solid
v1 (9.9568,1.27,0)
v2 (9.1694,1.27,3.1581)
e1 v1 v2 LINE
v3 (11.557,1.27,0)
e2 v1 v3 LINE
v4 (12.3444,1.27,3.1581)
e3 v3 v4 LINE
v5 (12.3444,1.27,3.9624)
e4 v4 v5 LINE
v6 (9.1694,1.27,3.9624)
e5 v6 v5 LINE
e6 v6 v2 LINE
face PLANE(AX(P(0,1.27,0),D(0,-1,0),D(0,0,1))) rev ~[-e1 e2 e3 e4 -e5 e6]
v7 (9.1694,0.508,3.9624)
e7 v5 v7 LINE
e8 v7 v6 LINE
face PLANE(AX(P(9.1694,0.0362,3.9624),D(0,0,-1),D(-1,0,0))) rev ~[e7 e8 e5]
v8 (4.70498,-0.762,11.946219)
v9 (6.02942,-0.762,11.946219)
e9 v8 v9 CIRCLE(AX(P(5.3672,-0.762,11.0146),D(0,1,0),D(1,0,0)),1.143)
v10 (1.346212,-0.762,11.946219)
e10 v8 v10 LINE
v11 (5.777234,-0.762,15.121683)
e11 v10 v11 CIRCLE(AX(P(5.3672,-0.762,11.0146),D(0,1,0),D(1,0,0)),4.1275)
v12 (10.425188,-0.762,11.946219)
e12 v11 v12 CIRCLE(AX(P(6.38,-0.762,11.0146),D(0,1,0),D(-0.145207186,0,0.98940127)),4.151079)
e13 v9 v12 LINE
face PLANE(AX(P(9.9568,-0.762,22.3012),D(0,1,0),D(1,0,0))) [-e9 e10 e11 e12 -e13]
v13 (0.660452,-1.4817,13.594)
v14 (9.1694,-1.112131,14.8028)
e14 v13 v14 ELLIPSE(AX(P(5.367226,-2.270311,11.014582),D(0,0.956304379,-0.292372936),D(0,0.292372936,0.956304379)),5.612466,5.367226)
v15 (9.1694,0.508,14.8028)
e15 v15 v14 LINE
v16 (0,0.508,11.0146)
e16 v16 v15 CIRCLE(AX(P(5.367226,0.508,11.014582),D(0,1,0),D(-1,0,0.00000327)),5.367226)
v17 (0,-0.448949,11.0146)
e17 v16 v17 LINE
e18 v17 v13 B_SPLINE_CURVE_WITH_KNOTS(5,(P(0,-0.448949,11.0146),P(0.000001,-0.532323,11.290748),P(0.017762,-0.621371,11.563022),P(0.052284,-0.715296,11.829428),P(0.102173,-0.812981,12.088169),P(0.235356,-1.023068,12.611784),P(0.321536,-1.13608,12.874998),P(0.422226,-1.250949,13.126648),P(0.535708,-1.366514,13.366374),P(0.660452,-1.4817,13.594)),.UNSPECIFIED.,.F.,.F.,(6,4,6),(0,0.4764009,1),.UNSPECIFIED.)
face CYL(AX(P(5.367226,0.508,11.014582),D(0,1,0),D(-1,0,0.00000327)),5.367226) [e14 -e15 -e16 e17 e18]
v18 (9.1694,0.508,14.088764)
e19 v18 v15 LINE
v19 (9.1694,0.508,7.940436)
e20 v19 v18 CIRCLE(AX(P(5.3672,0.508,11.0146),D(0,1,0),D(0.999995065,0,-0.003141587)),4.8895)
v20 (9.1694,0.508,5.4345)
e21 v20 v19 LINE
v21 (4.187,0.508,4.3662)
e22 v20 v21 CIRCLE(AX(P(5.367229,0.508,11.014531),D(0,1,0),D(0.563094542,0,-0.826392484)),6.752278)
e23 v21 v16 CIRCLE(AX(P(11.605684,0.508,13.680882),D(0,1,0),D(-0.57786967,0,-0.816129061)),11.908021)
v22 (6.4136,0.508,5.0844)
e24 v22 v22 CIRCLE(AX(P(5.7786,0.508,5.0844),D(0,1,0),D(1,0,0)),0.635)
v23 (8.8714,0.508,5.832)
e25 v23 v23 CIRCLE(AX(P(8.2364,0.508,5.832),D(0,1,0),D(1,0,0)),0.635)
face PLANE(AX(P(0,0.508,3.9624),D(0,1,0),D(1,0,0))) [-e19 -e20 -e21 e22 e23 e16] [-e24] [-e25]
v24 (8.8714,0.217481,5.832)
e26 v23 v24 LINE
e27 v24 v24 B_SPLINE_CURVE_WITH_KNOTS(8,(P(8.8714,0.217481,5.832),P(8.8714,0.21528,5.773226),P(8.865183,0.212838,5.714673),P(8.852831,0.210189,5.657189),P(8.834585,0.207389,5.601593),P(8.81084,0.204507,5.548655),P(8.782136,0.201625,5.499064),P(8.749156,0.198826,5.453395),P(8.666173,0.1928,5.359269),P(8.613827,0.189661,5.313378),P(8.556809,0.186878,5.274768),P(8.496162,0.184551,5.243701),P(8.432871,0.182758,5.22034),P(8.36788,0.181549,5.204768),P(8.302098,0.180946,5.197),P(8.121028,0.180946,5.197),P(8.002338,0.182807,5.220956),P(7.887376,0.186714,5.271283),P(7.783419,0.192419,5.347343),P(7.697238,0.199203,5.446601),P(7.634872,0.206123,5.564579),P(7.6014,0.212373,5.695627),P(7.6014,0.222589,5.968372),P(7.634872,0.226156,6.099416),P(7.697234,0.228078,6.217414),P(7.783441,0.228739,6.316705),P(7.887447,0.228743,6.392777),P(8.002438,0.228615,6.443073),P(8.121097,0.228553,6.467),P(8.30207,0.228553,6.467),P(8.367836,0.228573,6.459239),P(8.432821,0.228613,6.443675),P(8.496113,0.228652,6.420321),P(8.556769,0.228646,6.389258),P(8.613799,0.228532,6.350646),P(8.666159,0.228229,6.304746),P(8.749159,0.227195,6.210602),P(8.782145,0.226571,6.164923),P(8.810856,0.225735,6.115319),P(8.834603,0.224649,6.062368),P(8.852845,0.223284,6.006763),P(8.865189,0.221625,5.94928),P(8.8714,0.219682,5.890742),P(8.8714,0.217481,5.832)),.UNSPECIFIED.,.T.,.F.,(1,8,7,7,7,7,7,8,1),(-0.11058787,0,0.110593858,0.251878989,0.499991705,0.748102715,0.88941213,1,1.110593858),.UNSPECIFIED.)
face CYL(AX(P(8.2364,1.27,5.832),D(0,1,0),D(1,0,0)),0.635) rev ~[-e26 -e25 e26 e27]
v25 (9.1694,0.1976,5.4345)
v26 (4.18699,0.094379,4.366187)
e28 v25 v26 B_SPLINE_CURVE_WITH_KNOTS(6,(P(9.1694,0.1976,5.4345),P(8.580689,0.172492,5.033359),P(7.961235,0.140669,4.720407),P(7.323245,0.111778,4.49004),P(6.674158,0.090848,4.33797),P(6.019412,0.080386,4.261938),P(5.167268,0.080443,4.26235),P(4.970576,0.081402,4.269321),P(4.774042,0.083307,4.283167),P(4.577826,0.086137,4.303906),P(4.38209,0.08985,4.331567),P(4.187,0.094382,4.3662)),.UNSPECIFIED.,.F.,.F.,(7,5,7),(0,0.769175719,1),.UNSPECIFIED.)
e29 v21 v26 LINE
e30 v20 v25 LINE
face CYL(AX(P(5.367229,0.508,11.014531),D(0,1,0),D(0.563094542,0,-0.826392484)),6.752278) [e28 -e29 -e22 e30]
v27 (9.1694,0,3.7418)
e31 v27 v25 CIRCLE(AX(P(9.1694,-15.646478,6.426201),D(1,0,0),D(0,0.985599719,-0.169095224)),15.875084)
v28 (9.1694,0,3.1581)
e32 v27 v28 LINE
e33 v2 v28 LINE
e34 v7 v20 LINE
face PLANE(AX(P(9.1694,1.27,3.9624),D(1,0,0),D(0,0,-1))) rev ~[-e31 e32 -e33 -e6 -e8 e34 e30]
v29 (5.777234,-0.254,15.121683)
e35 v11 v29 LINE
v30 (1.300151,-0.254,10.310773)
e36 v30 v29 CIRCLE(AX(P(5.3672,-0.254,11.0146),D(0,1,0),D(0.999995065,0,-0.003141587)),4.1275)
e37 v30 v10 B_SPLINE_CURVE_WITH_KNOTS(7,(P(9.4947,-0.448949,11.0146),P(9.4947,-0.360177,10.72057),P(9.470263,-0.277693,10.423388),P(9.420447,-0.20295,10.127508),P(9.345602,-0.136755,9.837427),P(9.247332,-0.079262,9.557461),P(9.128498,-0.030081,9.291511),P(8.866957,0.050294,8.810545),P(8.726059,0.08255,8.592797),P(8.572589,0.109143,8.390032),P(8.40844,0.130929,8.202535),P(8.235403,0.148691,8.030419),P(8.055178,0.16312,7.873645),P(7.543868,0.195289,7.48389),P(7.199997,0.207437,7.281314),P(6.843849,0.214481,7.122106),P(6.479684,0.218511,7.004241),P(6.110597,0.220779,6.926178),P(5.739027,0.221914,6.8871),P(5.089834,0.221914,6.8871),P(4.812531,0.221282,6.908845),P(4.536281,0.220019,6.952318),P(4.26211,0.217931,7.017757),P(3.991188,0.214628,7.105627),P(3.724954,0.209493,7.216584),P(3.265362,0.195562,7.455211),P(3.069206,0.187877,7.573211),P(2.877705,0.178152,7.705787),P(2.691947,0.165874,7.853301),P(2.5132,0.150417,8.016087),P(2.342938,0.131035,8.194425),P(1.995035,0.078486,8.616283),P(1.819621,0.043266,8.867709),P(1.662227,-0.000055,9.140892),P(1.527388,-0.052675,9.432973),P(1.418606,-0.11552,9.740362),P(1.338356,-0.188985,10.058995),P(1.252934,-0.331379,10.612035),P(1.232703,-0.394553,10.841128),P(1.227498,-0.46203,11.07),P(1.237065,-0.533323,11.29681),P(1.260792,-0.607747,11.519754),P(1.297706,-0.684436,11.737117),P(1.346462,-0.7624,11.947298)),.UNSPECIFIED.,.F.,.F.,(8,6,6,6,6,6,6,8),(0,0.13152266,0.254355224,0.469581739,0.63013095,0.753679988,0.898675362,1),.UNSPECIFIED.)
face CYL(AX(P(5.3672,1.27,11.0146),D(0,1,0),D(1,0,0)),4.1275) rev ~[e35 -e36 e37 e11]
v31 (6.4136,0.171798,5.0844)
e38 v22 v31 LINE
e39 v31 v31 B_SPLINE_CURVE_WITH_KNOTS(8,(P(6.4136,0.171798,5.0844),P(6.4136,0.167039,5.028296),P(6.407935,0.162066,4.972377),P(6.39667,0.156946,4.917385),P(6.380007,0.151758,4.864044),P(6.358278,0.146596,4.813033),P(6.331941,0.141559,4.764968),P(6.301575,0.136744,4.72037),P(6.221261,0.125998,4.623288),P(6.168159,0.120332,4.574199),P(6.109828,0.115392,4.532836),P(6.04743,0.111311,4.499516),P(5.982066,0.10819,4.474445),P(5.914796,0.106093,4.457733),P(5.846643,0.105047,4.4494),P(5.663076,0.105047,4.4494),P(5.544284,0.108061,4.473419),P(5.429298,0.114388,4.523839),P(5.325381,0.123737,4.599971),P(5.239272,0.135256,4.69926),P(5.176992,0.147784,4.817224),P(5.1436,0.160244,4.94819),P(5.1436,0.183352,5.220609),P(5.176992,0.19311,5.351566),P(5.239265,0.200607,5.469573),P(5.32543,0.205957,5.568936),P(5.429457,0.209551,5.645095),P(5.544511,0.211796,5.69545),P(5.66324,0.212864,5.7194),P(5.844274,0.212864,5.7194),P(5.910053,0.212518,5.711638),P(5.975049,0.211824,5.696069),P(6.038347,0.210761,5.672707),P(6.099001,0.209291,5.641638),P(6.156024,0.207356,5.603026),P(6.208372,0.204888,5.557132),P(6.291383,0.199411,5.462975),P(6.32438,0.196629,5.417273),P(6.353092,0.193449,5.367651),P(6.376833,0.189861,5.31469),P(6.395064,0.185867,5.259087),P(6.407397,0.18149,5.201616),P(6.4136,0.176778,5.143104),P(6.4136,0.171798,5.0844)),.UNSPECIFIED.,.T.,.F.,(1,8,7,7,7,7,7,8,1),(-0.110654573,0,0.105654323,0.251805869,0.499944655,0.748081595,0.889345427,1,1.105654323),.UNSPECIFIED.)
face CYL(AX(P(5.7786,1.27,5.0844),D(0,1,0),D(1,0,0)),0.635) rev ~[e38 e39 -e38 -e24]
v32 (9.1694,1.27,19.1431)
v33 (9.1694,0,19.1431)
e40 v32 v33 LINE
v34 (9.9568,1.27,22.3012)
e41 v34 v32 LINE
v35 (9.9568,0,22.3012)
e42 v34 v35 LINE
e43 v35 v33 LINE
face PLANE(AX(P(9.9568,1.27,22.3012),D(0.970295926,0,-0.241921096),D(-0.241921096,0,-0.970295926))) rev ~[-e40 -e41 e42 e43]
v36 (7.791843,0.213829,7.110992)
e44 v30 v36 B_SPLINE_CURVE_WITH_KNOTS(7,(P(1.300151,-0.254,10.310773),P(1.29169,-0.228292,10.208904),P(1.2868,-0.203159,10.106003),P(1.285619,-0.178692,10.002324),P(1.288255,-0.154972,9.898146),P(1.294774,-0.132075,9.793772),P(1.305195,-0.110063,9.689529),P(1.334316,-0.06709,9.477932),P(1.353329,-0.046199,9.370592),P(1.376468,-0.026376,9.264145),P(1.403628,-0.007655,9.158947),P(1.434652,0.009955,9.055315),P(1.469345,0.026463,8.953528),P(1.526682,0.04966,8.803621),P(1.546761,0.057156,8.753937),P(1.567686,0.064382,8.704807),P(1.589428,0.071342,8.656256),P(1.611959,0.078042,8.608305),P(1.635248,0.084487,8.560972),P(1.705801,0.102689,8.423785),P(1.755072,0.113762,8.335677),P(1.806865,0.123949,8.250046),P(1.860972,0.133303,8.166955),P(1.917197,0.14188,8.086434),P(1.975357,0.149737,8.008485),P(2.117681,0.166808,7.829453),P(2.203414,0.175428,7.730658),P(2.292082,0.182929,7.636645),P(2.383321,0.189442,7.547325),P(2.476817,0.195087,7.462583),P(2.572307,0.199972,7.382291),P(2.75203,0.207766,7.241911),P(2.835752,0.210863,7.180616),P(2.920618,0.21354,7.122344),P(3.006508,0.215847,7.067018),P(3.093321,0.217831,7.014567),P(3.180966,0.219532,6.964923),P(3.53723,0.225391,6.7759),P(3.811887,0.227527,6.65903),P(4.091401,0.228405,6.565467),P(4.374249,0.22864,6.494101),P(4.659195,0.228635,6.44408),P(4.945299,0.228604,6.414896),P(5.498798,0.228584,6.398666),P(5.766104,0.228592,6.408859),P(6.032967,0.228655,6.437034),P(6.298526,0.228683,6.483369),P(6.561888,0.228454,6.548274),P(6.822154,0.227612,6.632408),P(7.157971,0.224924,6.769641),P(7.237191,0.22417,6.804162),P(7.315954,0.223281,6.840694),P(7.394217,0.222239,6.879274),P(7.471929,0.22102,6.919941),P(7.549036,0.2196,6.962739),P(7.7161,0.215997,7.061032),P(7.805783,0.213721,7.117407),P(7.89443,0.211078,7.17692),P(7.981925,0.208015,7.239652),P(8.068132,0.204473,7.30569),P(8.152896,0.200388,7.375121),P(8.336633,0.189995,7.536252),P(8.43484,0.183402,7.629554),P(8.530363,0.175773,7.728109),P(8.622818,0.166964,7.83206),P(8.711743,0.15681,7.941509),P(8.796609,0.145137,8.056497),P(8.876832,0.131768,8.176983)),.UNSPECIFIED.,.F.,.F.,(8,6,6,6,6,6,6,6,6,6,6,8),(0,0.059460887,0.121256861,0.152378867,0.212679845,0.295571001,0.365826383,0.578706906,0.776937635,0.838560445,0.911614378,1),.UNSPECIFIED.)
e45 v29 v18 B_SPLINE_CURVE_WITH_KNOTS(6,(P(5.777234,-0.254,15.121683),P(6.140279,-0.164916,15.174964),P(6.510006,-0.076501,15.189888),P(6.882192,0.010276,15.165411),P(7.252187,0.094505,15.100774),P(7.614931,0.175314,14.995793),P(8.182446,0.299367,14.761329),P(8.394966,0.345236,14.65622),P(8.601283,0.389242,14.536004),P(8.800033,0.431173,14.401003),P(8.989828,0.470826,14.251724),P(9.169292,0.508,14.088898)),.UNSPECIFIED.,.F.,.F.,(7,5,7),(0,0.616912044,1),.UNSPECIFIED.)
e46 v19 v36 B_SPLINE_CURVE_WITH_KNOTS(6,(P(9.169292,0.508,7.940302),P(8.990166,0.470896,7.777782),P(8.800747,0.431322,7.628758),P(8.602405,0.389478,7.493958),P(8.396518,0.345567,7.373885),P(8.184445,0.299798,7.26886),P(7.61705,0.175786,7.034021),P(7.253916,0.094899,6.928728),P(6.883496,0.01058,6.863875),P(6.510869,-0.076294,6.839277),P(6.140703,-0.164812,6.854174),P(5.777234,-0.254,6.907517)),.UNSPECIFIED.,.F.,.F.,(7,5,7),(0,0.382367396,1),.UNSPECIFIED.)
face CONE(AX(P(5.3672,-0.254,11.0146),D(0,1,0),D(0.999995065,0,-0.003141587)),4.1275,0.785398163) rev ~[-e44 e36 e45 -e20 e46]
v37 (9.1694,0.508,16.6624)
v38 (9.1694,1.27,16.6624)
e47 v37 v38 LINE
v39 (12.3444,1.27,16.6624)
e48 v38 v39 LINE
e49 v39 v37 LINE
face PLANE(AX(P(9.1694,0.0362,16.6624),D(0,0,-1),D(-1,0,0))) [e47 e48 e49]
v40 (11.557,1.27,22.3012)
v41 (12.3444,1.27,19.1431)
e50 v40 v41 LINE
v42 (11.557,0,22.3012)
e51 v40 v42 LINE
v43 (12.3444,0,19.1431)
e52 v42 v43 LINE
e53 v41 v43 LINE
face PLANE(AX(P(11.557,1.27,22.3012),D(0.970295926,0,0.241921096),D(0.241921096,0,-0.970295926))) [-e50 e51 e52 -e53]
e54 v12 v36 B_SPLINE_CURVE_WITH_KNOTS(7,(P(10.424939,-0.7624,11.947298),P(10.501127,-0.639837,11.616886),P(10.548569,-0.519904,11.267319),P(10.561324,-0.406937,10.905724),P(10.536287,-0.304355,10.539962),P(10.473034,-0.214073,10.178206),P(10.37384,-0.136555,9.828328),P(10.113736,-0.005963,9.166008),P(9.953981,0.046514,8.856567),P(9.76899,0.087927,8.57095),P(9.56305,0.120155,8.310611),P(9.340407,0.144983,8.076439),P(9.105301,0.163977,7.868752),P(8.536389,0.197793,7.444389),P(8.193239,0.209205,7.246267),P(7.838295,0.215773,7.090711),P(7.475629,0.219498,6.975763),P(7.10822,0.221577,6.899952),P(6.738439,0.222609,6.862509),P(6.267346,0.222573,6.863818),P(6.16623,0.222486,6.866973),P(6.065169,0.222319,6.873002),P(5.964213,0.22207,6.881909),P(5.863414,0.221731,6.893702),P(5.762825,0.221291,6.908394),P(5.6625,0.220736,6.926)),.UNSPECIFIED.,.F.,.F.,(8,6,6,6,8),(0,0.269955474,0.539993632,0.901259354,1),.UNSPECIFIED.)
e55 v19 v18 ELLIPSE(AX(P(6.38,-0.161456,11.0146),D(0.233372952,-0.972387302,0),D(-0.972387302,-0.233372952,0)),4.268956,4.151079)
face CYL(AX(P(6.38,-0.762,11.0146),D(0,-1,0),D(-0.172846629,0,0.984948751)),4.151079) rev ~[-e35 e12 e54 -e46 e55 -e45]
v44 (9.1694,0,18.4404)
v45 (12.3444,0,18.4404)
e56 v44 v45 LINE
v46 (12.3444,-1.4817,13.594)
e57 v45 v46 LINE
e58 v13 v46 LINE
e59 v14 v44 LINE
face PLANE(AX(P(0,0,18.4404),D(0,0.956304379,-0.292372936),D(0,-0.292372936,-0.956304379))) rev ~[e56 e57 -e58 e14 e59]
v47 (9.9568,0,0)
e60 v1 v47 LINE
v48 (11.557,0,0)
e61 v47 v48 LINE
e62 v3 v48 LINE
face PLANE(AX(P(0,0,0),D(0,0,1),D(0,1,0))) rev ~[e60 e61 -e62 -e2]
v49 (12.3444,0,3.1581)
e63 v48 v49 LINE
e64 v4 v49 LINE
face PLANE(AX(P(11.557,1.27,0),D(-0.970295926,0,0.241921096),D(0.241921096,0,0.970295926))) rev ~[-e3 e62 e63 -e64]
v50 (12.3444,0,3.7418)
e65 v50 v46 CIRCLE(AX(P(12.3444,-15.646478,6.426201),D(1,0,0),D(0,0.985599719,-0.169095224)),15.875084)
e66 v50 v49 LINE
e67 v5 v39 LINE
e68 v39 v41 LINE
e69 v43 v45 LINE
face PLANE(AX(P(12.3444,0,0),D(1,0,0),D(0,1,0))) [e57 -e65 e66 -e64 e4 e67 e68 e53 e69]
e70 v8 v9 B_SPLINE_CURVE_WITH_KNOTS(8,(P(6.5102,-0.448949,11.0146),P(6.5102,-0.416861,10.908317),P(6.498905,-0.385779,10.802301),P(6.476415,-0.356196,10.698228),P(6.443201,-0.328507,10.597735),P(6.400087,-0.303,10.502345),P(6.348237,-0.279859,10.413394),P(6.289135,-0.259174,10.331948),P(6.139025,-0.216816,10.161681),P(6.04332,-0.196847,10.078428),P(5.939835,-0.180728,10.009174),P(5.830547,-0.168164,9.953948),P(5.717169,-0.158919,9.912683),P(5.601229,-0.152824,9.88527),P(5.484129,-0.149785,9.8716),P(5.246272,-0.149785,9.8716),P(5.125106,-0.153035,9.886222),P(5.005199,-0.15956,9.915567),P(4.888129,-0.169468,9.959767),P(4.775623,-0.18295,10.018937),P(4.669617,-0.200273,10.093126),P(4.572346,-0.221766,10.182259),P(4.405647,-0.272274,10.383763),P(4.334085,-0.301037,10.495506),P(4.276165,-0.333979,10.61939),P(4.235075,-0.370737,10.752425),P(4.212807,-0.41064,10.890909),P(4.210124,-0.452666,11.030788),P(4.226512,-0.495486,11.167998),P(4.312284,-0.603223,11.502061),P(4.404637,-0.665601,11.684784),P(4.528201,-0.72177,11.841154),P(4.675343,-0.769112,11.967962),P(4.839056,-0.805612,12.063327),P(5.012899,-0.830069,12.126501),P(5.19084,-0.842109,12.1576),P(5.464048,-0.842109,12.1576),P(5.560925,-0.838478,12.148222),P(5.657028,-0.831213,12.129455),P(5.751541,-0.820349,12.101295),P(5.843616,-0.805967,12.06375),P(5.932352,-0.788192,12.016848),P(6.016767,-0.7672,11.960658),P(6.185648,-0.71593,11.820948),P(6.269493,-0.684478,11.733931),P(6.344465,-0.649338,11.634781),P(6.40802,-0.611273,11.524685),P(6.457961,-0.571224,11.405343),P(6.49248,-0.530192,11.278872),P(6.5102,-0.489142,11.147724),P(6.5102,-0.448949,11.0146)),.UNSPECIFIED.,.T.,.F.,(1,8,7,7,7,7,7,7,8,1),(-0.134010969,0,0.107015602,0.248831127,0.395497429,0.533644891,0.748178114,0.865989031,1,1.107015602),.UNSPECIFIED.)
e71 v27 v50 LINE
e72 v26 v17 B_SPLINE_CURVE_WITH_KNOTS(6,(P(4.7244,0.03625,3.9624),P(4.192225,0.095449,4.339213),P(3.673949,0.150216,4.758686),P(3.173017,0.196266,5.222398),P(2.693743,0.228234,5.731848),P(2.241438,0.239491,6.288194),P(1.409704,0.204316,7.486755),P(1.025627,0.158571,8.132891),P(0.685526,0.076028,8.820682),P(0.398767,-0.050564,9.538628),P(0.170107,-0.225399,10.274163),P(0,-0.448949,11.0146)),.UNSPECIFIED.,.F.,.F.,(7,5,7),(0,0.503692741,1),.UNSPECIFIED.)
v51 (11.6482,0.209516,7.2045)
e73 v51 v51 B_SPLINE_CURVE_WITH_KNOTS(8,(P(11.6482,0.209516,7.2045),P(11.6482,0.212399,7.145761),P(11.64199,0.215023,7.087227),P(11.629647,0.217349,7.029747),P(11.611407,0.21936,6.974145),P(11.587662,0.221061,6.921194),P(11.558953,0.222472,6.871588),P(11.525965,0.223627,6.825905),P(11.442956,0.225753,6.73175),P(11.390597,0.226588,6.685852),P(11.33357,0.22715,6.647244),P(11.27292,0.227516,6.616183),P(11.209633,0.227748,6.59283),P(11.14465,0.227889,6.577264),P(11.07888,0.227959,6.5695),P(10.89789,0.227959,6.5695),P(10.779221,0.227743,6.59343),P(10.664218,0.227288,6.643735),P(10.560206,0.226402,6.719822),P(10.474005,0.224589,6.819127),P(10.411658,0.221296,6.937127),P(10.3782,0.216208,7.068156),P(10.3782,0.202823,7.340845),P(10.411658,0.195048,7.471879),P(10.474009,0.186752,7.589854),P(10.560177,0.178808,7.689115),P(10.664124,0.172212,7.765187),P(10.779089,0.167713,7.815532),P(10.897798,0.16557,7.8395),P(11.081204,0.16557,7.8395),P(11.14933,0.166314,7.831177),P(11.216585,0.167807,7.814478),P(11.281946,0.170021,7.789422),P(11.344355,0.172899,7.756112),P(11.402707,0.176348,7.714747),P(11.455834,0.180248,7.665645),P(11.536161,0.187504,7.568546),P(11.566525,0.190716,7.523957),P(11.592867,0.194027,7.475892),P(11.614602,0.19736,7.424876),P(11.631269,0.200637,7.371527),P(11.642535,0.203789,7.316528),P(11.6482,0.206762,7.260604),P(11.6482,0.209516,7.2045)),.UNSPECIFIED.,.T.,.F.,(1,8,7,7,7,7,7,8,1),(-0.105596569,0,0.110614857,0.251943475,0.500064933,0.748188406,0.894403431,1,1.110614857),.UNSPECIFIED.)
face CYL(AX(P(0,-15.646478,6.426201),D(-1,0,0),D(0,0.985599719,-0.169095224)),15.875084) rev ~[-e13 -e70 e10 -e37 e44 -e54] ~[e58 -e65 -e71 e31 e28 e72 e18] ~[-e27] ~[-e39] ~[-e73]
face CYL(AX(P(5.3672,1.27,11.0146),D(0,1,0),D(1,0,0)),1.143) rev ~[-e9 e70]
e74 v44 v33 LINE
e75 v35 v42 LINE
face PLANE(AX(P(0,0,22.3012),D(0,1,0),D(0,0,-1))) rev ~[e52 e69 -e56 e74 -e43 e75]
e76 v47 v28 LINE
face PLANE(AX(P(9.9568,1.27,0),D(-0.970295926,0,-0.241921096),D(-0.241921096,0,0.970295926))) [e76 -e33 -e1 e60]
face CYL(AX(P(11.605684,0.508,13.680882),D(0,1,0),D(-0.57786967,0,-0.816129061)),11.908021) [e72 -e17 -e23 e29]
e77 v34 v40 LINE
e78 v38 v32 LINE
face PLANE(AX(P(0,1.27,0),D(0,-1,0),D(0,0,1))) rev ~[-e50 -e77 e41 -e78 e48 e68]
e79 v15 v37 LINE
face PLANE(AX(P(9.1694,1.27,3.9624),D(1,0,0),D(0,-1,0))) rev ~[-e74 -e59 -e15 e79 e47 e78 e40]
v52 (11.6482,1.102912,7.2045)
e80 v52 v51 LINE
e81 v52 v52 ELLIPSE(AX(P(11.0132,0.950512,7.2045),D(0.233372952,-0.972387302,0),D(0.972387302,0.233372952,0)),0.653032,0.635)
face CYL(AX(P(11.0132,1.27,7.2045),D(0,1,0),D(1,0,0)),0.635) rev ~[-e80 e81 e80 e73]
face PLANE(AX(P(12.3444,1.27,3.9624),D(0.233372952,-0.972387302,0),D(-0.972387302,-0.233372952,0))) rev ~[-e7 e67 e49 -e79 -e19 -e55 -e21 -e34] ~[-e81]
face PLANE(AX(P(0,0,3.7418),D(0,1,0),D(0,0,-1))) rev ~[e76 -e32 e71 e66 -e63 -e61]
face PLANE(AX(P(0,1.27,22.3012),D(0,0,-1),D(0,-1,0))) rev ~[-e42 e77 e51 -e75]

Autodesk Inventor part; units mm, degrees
ref_plane "YZ Plane" through (0, 0, 0) normal (1, 0, 0) x (0, 1, 0)
ref_plane "XZ Plane" through (0, 0, 0) normal (0, 1, 0) x (-1, 0, 0)
ref_plane "XY Plane" through (0, 0, 0) normal (0, 0, 1) x (1, 0, 0)
sketch "Sketch1" plane through (0, 0, 0) normal (1, 0, 0) x (0, 1, 0)
  line L0 (0, 0) -> (1.27, 0)
  line L1 (1.27, 0) -> (1.27, 22.3012)
  line L2 (1.27, 22.3012) -> (0, 22.3012)
  arc A0 (0, 3.7418) -> (-1.4817, 13.594) centre (-15.6464, 6.4262) ccw
  line L3 (0, 18.4404) -> (-1.4817, 13.594)
  line L4 (0, 22.3012) -> (0, 18.4404)
  line L5 (0, 3.7418) -> (0, 0)
  dimension "d0" = 1.27
  dimension "d1" = 22.3012
  dimension "d2" = 31.75
  dimension "d3" = 6.4262
  dimension "d4" = 16.9164
  dimension "d6" = 3.8608
extrude "Extrusion1" add sketch "Sketch1" along normal blind 12.3444
sketch "Sketch2" plane through (0, 1.27, 22.3012) normal (0, 1, 0) x (1, 0, 0)
  line L0 (0, 0) -> (12.3444, 0) projected
  line L1 (9.9568, 0) -> (9.1694, 3.1581)
  line L2 (11.557, 0) -> (12.3444, 3.1581)
  line L3 (9.1694, 3.1581) -> (9.1694, 19.1431)
  line L4 (12.3444, 22.3012) -> (12.3444, 0) projected
  line L5 (10.7569, 0) -> (10.7569, 22.3012)
  line L6 (0, 22.3012) -> (12.3444, 22.3012) projected
  line L7 (9.9568, 22.3012) -> (9.1694, 19.1431)
  line L8 (11.557, 22.3012) -> (12.3444, 19.1431)
  line L9 (9.1694, 19.1431) -> (0, 19.1431)
  line L10 (9.1694, 3.1581) -> (0, 3.1581)
  line L11 (0, 22.3012) -> (0, 0) projected
  line L12 (0, 19.1431) -> (0, 22.3012)
  line L13 (0, 22.3012) -> (9.9568, 22.3012)
  line L14 (0, 3.1581) -> (0, 0)
  dimension "d9" = 1.6002
  dimension "d13" = 28
  dimension "d14" = 3.175
  dimension "d15" = 1.5875
  dimension "d16" = 1.6002
  dimension "d17" = 28
extrude "Extrusion2" cut sketch "Sketch2" against normal blind 25.4 contours L11 L10 L1 L0 | L11 L6 L7 L9 | L2 L4 L0 | L6 L4 L8
sketch "Sketch8" plane through (0, 1.27, 3.1581) normal (0, 1, 0) x (1, 0, 0)
  line L0 (9.1694, -0.8043) -> (0, -0.8043)
  line L1 (9.1694, 0) -> (0, 0) projected
  line L2 (0, -0.8043) -> (9.1694, -0.8043)
  line L3 (9.1694, -0.8043) -> (9.1694, 0)
  line L4 (9.1694, 0) -> (0, 0)
  line L5 (0, 0) -> (0, -0.8043)
  point P0 (0, 3.1581)
  point P1 (0, -10.4309)
extrude "Extrusion5" cut sketch "Sketch8" against normal blind 25.4
sketch "Sketch9" plane through (9.9568, 1.27, 22.3012) normal (0, 1, 0) x (1, 0, 0)
  line L0 (-10.6834, 14.9326) -> (-5.2324, 18.3388)
  line L1 (-5.2324, 18.3388) -> (-10.6834, 18.3388)
  line L2 (-10.6834, 18.3388) -> (-10.6834, 14.9326)
  line L3 (-0.7874, 19.1431) -> (-0.7874, 18.3388) projected
  line L4 (-0.7874, 18.3388) -> (-9.9568, 18.3388) projected
  point P0 (-9.9568, 22.3012)
  dimension "d41" = 32
  dimension "d42" = 4.445
extrude "Extrusion6" cut sketch "Sketch9" against normal blind 25.4
sketch "Sketch14" plane through (9.9568, 1.27, 22.3012) normal (0, 1, 0) x (1, 0, 0)
  circle A0 centre (-4.5896, 11.2866) radius 1.143
  line L0 (-5.2273, 9.7597) -> (-3.813, 11.1739)
  line L1 (-5.2273, 9.7597) -> (-3.2273, 9.7597) construction
  line L2 (-3.813, 11.1739) -> (-5.2273, 11.1739)
  line L3 (-5.2273, 11.1739) -> (-5.2273, 9.7597)
  line L4 (-3.813, 11.1739) -> (-3.813, 9.7597)
  line L5 (-3.813, 9.7597) -> (-5.2273, 9.7597)
  circle A1 centre (-4.5201, 10.4668) radius 3.175
  point P0 (-9.9568, 22.3012)
  dimension "d78" = 2.286
  dimension "d86" = 2
  dimension "d87" = 45
  dimension "d88" = 6.35
extrude "Extrusion11" cut sketch "Sketch14" against normal blind 25.4 contours A0 L4 L2 L3 | L3 L2 L0 A0 | A0 L0 L4
sketch "Sketch15" plane through (9.9568, 1.27, 22.3012) normal (0, 1, 0) x (1, 0, 0)
  circle A0 centre (-4.5896, 11.2866) radius 1.143 projected
  circle A1 centre (-4.5896, 11.2866) radius 0.9525
  circle A2 centre (-4.5896, 11.2866) radius 4.1275
  point P0 (-9.9568, 22.3012)
  dimension "d82" = 1.905
  dimension "d83" = 8.255
extrude "Extrusion12" cut sketch "Sketch15" against normal blind 2.032 contours A2
sketch "Sketch19" plane through (9.9568, 1.27, 22.3012) normal (0, 1, 0) x (1, 0, 0)
  circle A0 centre (1.0564, 15.0967) radius 0.635
  circle A1 centre (-1.7204, 16.4692) radius 0.635
  circle A2 centre (-4.1782, 17.2168) radius 0.635
  point P0 (-9.9568, 22.3012)
  dimension "d102" = 1.27
  dimension "d103" = 1.27
  dimension "d104" = 1.27
extrude "Extrusion17" cut sketch "Sketch19" against normal blind 2.286
sketch "Sketch27" plane through (9.1694, 0.0362, 3.9624) normal (0, 0, -1) x (-1, 0, 0)
  line L0 (0, 1.2338) -> (0, -0.0362) projected
  line L1 (9.1694, 1.2338) -> (9.1694, 0.1848) projected
  line L2 (0, 1.2338) -> (9.1694, 1.2338)
  line L3 (9.1694, 1.2338) -> (9.1694, 0.4718)
  line L4 (9.1694, 0.4718) -> (0, 0.4718)
  line L5 (0, 0.4718) -> (0, 1.2338)
  point P0 (9.1694, -0.0362)
  dimension "d122" = 0.762
extrude "Extrusion22" cut sketch "Sketch27" against normal through all
sketch "Sketch29" plane through (4.7244, 0.508, 3.9624) normal (0, 1, 0) x (1, 0, 0)
  arc A0 (-0.0195, -7.9838) -> (1.3051, -7.9838) centre (0.6428, -7.0522) ccw projected
  arc A1 (-4.7244, -7.0522) -> (4.445, -10.8404) centre (0.6428, -7.0522) ccw
  line L0 (-4.7244, -15.1807) -> (-4.7244, -2.9521) projected
  line L1 (4.445, -8.6583) -> (4.445, -15.1807) projected
  line L2 (4.445, -10.8404) -> (4.445, -15.1807)
  line L3 (4.445, -15.1807) -> (-4.7244, -15.1807)
  point P0 (-4.7244, 3.9624)
extrude "Extrusion23" cut sketch "Sketch29" against normal through all
sketch "Sketch30" plane through (4.7244, 0.508, 3.9624) normal (0, 1, 0) x (1, 0, 0)
  line L0 (0, 0) -> (-4.7244, -2.9521) projected
  line L1 (-4.7244, -2.9521) -> (-4.7244, -7.0522) projected
  arc A0 (0, 0) -> (-4.7244, -7.0522) centre (6.8812, -9.7184) ccw
  line L2 (-4.7244, -7.0522) -> (-4.7244, -2.9521)
  point P0 (-4.7244, 3.9624)
extrude "Extrusion24" cut sketch "Sketch30" against normal through all
sketch "Sketch32" plane through (9.1694, 0.0362, 3.9624) normal (0, 0, -1) x (-1, 0, 0)
  line L0 (4.445, 0.4718) -> (0, 0.4718) projected
  line L1 (0, 0.4718) -> (0, 1.2338)
  line L2 (0, 1.2338) -> (-3.175, 1.2338)
  line L3 (0, 0.4718) -> (0, 0) projected
  line L4 (-3.175, 1.2338) -> (0, 0.4718)
  point P0 (9.1694, -0.0362)
extrude "Extrusion26" cut sketch "Sketch32" against normal blind 12.7
sketch "Sketch37" plane through (4.7244, 0.508, 3.9624) normal (0, 1, 0) x (1, 0, 0)
  arc A0 (4.445, -5.4461) -> (4.445, -8.6583) centre (0.6428, -7.0522) ccw projected
  arc A1 (4.445, -1.4721) -> (-0.5374, -0.4038) centre (0.6428, -7.0522) ccw
  line L0 (4.445, 0) -> (4.445, -5.4461) projected
  line L1 (4.445, -1.4721) -> (4.445, 0)
  line L2 (4.445, 0) -> (0, 0)
  arc A2 (0, 0) -> (-4.7244, -7.0522) centre (6.8812, -9.7184) ccw projected
  line L3 (0, 0) -> (4.445, 0) projected
  arc A3 (0, 0) -> (-0.5374, -0.4038) centre (1.2434, -2.2145) ccw
  point P0 (-4.7244, 3.9624)
extrude "Extrusion27" cut sketch "Sketch37" against normal blind 12.7 contours A1 A2 L2 L0
chamfer "Chamfer4" distance 0.762 angle 45 1 edges at (1.2397, 0.508, 11.0146)
sketch "Sketch38" plane through (9.9568, -0.762, 22.3012) normal (0, 1, 0) x (1, 0, 0)
  ellipse E0 centre (-3.5768, 11.2866) end of major axis (-7.7968, 11.2866) minor radius 4.0967 (-3.9624, 7.207) -> (-0.7874, 8.2124) ccw projected
  arc A0 (-4.2943, 7.198) -> (-4.2943, 15.3752) centre (-3.5768, 11.2866) ccw
  arc A1 (-3.9624, 7.207) -> (-2.158, 14.6218) centre (-4.5896, 11.2866) ccw projected
  arc A2 (-4.2943, 7.198) -> (-4.2943, 15.3752) centre (-4.5896, 11.2866) ccw
  point P0 (-9.9568, 22.3012)
extrude "Extrusion28" cut sketch "Sketch38" along normal blind 12.7
sketch "Sketch39" plane through (5.3672, 0.508, 11.0146) normal (0, 1, 0) x (1, 0, 0)
  point P0 (-5.3672, 11.0146)
equation "\"d15\" = 0.5 * d14"
properties part number "headppost_Turi_2gen"
